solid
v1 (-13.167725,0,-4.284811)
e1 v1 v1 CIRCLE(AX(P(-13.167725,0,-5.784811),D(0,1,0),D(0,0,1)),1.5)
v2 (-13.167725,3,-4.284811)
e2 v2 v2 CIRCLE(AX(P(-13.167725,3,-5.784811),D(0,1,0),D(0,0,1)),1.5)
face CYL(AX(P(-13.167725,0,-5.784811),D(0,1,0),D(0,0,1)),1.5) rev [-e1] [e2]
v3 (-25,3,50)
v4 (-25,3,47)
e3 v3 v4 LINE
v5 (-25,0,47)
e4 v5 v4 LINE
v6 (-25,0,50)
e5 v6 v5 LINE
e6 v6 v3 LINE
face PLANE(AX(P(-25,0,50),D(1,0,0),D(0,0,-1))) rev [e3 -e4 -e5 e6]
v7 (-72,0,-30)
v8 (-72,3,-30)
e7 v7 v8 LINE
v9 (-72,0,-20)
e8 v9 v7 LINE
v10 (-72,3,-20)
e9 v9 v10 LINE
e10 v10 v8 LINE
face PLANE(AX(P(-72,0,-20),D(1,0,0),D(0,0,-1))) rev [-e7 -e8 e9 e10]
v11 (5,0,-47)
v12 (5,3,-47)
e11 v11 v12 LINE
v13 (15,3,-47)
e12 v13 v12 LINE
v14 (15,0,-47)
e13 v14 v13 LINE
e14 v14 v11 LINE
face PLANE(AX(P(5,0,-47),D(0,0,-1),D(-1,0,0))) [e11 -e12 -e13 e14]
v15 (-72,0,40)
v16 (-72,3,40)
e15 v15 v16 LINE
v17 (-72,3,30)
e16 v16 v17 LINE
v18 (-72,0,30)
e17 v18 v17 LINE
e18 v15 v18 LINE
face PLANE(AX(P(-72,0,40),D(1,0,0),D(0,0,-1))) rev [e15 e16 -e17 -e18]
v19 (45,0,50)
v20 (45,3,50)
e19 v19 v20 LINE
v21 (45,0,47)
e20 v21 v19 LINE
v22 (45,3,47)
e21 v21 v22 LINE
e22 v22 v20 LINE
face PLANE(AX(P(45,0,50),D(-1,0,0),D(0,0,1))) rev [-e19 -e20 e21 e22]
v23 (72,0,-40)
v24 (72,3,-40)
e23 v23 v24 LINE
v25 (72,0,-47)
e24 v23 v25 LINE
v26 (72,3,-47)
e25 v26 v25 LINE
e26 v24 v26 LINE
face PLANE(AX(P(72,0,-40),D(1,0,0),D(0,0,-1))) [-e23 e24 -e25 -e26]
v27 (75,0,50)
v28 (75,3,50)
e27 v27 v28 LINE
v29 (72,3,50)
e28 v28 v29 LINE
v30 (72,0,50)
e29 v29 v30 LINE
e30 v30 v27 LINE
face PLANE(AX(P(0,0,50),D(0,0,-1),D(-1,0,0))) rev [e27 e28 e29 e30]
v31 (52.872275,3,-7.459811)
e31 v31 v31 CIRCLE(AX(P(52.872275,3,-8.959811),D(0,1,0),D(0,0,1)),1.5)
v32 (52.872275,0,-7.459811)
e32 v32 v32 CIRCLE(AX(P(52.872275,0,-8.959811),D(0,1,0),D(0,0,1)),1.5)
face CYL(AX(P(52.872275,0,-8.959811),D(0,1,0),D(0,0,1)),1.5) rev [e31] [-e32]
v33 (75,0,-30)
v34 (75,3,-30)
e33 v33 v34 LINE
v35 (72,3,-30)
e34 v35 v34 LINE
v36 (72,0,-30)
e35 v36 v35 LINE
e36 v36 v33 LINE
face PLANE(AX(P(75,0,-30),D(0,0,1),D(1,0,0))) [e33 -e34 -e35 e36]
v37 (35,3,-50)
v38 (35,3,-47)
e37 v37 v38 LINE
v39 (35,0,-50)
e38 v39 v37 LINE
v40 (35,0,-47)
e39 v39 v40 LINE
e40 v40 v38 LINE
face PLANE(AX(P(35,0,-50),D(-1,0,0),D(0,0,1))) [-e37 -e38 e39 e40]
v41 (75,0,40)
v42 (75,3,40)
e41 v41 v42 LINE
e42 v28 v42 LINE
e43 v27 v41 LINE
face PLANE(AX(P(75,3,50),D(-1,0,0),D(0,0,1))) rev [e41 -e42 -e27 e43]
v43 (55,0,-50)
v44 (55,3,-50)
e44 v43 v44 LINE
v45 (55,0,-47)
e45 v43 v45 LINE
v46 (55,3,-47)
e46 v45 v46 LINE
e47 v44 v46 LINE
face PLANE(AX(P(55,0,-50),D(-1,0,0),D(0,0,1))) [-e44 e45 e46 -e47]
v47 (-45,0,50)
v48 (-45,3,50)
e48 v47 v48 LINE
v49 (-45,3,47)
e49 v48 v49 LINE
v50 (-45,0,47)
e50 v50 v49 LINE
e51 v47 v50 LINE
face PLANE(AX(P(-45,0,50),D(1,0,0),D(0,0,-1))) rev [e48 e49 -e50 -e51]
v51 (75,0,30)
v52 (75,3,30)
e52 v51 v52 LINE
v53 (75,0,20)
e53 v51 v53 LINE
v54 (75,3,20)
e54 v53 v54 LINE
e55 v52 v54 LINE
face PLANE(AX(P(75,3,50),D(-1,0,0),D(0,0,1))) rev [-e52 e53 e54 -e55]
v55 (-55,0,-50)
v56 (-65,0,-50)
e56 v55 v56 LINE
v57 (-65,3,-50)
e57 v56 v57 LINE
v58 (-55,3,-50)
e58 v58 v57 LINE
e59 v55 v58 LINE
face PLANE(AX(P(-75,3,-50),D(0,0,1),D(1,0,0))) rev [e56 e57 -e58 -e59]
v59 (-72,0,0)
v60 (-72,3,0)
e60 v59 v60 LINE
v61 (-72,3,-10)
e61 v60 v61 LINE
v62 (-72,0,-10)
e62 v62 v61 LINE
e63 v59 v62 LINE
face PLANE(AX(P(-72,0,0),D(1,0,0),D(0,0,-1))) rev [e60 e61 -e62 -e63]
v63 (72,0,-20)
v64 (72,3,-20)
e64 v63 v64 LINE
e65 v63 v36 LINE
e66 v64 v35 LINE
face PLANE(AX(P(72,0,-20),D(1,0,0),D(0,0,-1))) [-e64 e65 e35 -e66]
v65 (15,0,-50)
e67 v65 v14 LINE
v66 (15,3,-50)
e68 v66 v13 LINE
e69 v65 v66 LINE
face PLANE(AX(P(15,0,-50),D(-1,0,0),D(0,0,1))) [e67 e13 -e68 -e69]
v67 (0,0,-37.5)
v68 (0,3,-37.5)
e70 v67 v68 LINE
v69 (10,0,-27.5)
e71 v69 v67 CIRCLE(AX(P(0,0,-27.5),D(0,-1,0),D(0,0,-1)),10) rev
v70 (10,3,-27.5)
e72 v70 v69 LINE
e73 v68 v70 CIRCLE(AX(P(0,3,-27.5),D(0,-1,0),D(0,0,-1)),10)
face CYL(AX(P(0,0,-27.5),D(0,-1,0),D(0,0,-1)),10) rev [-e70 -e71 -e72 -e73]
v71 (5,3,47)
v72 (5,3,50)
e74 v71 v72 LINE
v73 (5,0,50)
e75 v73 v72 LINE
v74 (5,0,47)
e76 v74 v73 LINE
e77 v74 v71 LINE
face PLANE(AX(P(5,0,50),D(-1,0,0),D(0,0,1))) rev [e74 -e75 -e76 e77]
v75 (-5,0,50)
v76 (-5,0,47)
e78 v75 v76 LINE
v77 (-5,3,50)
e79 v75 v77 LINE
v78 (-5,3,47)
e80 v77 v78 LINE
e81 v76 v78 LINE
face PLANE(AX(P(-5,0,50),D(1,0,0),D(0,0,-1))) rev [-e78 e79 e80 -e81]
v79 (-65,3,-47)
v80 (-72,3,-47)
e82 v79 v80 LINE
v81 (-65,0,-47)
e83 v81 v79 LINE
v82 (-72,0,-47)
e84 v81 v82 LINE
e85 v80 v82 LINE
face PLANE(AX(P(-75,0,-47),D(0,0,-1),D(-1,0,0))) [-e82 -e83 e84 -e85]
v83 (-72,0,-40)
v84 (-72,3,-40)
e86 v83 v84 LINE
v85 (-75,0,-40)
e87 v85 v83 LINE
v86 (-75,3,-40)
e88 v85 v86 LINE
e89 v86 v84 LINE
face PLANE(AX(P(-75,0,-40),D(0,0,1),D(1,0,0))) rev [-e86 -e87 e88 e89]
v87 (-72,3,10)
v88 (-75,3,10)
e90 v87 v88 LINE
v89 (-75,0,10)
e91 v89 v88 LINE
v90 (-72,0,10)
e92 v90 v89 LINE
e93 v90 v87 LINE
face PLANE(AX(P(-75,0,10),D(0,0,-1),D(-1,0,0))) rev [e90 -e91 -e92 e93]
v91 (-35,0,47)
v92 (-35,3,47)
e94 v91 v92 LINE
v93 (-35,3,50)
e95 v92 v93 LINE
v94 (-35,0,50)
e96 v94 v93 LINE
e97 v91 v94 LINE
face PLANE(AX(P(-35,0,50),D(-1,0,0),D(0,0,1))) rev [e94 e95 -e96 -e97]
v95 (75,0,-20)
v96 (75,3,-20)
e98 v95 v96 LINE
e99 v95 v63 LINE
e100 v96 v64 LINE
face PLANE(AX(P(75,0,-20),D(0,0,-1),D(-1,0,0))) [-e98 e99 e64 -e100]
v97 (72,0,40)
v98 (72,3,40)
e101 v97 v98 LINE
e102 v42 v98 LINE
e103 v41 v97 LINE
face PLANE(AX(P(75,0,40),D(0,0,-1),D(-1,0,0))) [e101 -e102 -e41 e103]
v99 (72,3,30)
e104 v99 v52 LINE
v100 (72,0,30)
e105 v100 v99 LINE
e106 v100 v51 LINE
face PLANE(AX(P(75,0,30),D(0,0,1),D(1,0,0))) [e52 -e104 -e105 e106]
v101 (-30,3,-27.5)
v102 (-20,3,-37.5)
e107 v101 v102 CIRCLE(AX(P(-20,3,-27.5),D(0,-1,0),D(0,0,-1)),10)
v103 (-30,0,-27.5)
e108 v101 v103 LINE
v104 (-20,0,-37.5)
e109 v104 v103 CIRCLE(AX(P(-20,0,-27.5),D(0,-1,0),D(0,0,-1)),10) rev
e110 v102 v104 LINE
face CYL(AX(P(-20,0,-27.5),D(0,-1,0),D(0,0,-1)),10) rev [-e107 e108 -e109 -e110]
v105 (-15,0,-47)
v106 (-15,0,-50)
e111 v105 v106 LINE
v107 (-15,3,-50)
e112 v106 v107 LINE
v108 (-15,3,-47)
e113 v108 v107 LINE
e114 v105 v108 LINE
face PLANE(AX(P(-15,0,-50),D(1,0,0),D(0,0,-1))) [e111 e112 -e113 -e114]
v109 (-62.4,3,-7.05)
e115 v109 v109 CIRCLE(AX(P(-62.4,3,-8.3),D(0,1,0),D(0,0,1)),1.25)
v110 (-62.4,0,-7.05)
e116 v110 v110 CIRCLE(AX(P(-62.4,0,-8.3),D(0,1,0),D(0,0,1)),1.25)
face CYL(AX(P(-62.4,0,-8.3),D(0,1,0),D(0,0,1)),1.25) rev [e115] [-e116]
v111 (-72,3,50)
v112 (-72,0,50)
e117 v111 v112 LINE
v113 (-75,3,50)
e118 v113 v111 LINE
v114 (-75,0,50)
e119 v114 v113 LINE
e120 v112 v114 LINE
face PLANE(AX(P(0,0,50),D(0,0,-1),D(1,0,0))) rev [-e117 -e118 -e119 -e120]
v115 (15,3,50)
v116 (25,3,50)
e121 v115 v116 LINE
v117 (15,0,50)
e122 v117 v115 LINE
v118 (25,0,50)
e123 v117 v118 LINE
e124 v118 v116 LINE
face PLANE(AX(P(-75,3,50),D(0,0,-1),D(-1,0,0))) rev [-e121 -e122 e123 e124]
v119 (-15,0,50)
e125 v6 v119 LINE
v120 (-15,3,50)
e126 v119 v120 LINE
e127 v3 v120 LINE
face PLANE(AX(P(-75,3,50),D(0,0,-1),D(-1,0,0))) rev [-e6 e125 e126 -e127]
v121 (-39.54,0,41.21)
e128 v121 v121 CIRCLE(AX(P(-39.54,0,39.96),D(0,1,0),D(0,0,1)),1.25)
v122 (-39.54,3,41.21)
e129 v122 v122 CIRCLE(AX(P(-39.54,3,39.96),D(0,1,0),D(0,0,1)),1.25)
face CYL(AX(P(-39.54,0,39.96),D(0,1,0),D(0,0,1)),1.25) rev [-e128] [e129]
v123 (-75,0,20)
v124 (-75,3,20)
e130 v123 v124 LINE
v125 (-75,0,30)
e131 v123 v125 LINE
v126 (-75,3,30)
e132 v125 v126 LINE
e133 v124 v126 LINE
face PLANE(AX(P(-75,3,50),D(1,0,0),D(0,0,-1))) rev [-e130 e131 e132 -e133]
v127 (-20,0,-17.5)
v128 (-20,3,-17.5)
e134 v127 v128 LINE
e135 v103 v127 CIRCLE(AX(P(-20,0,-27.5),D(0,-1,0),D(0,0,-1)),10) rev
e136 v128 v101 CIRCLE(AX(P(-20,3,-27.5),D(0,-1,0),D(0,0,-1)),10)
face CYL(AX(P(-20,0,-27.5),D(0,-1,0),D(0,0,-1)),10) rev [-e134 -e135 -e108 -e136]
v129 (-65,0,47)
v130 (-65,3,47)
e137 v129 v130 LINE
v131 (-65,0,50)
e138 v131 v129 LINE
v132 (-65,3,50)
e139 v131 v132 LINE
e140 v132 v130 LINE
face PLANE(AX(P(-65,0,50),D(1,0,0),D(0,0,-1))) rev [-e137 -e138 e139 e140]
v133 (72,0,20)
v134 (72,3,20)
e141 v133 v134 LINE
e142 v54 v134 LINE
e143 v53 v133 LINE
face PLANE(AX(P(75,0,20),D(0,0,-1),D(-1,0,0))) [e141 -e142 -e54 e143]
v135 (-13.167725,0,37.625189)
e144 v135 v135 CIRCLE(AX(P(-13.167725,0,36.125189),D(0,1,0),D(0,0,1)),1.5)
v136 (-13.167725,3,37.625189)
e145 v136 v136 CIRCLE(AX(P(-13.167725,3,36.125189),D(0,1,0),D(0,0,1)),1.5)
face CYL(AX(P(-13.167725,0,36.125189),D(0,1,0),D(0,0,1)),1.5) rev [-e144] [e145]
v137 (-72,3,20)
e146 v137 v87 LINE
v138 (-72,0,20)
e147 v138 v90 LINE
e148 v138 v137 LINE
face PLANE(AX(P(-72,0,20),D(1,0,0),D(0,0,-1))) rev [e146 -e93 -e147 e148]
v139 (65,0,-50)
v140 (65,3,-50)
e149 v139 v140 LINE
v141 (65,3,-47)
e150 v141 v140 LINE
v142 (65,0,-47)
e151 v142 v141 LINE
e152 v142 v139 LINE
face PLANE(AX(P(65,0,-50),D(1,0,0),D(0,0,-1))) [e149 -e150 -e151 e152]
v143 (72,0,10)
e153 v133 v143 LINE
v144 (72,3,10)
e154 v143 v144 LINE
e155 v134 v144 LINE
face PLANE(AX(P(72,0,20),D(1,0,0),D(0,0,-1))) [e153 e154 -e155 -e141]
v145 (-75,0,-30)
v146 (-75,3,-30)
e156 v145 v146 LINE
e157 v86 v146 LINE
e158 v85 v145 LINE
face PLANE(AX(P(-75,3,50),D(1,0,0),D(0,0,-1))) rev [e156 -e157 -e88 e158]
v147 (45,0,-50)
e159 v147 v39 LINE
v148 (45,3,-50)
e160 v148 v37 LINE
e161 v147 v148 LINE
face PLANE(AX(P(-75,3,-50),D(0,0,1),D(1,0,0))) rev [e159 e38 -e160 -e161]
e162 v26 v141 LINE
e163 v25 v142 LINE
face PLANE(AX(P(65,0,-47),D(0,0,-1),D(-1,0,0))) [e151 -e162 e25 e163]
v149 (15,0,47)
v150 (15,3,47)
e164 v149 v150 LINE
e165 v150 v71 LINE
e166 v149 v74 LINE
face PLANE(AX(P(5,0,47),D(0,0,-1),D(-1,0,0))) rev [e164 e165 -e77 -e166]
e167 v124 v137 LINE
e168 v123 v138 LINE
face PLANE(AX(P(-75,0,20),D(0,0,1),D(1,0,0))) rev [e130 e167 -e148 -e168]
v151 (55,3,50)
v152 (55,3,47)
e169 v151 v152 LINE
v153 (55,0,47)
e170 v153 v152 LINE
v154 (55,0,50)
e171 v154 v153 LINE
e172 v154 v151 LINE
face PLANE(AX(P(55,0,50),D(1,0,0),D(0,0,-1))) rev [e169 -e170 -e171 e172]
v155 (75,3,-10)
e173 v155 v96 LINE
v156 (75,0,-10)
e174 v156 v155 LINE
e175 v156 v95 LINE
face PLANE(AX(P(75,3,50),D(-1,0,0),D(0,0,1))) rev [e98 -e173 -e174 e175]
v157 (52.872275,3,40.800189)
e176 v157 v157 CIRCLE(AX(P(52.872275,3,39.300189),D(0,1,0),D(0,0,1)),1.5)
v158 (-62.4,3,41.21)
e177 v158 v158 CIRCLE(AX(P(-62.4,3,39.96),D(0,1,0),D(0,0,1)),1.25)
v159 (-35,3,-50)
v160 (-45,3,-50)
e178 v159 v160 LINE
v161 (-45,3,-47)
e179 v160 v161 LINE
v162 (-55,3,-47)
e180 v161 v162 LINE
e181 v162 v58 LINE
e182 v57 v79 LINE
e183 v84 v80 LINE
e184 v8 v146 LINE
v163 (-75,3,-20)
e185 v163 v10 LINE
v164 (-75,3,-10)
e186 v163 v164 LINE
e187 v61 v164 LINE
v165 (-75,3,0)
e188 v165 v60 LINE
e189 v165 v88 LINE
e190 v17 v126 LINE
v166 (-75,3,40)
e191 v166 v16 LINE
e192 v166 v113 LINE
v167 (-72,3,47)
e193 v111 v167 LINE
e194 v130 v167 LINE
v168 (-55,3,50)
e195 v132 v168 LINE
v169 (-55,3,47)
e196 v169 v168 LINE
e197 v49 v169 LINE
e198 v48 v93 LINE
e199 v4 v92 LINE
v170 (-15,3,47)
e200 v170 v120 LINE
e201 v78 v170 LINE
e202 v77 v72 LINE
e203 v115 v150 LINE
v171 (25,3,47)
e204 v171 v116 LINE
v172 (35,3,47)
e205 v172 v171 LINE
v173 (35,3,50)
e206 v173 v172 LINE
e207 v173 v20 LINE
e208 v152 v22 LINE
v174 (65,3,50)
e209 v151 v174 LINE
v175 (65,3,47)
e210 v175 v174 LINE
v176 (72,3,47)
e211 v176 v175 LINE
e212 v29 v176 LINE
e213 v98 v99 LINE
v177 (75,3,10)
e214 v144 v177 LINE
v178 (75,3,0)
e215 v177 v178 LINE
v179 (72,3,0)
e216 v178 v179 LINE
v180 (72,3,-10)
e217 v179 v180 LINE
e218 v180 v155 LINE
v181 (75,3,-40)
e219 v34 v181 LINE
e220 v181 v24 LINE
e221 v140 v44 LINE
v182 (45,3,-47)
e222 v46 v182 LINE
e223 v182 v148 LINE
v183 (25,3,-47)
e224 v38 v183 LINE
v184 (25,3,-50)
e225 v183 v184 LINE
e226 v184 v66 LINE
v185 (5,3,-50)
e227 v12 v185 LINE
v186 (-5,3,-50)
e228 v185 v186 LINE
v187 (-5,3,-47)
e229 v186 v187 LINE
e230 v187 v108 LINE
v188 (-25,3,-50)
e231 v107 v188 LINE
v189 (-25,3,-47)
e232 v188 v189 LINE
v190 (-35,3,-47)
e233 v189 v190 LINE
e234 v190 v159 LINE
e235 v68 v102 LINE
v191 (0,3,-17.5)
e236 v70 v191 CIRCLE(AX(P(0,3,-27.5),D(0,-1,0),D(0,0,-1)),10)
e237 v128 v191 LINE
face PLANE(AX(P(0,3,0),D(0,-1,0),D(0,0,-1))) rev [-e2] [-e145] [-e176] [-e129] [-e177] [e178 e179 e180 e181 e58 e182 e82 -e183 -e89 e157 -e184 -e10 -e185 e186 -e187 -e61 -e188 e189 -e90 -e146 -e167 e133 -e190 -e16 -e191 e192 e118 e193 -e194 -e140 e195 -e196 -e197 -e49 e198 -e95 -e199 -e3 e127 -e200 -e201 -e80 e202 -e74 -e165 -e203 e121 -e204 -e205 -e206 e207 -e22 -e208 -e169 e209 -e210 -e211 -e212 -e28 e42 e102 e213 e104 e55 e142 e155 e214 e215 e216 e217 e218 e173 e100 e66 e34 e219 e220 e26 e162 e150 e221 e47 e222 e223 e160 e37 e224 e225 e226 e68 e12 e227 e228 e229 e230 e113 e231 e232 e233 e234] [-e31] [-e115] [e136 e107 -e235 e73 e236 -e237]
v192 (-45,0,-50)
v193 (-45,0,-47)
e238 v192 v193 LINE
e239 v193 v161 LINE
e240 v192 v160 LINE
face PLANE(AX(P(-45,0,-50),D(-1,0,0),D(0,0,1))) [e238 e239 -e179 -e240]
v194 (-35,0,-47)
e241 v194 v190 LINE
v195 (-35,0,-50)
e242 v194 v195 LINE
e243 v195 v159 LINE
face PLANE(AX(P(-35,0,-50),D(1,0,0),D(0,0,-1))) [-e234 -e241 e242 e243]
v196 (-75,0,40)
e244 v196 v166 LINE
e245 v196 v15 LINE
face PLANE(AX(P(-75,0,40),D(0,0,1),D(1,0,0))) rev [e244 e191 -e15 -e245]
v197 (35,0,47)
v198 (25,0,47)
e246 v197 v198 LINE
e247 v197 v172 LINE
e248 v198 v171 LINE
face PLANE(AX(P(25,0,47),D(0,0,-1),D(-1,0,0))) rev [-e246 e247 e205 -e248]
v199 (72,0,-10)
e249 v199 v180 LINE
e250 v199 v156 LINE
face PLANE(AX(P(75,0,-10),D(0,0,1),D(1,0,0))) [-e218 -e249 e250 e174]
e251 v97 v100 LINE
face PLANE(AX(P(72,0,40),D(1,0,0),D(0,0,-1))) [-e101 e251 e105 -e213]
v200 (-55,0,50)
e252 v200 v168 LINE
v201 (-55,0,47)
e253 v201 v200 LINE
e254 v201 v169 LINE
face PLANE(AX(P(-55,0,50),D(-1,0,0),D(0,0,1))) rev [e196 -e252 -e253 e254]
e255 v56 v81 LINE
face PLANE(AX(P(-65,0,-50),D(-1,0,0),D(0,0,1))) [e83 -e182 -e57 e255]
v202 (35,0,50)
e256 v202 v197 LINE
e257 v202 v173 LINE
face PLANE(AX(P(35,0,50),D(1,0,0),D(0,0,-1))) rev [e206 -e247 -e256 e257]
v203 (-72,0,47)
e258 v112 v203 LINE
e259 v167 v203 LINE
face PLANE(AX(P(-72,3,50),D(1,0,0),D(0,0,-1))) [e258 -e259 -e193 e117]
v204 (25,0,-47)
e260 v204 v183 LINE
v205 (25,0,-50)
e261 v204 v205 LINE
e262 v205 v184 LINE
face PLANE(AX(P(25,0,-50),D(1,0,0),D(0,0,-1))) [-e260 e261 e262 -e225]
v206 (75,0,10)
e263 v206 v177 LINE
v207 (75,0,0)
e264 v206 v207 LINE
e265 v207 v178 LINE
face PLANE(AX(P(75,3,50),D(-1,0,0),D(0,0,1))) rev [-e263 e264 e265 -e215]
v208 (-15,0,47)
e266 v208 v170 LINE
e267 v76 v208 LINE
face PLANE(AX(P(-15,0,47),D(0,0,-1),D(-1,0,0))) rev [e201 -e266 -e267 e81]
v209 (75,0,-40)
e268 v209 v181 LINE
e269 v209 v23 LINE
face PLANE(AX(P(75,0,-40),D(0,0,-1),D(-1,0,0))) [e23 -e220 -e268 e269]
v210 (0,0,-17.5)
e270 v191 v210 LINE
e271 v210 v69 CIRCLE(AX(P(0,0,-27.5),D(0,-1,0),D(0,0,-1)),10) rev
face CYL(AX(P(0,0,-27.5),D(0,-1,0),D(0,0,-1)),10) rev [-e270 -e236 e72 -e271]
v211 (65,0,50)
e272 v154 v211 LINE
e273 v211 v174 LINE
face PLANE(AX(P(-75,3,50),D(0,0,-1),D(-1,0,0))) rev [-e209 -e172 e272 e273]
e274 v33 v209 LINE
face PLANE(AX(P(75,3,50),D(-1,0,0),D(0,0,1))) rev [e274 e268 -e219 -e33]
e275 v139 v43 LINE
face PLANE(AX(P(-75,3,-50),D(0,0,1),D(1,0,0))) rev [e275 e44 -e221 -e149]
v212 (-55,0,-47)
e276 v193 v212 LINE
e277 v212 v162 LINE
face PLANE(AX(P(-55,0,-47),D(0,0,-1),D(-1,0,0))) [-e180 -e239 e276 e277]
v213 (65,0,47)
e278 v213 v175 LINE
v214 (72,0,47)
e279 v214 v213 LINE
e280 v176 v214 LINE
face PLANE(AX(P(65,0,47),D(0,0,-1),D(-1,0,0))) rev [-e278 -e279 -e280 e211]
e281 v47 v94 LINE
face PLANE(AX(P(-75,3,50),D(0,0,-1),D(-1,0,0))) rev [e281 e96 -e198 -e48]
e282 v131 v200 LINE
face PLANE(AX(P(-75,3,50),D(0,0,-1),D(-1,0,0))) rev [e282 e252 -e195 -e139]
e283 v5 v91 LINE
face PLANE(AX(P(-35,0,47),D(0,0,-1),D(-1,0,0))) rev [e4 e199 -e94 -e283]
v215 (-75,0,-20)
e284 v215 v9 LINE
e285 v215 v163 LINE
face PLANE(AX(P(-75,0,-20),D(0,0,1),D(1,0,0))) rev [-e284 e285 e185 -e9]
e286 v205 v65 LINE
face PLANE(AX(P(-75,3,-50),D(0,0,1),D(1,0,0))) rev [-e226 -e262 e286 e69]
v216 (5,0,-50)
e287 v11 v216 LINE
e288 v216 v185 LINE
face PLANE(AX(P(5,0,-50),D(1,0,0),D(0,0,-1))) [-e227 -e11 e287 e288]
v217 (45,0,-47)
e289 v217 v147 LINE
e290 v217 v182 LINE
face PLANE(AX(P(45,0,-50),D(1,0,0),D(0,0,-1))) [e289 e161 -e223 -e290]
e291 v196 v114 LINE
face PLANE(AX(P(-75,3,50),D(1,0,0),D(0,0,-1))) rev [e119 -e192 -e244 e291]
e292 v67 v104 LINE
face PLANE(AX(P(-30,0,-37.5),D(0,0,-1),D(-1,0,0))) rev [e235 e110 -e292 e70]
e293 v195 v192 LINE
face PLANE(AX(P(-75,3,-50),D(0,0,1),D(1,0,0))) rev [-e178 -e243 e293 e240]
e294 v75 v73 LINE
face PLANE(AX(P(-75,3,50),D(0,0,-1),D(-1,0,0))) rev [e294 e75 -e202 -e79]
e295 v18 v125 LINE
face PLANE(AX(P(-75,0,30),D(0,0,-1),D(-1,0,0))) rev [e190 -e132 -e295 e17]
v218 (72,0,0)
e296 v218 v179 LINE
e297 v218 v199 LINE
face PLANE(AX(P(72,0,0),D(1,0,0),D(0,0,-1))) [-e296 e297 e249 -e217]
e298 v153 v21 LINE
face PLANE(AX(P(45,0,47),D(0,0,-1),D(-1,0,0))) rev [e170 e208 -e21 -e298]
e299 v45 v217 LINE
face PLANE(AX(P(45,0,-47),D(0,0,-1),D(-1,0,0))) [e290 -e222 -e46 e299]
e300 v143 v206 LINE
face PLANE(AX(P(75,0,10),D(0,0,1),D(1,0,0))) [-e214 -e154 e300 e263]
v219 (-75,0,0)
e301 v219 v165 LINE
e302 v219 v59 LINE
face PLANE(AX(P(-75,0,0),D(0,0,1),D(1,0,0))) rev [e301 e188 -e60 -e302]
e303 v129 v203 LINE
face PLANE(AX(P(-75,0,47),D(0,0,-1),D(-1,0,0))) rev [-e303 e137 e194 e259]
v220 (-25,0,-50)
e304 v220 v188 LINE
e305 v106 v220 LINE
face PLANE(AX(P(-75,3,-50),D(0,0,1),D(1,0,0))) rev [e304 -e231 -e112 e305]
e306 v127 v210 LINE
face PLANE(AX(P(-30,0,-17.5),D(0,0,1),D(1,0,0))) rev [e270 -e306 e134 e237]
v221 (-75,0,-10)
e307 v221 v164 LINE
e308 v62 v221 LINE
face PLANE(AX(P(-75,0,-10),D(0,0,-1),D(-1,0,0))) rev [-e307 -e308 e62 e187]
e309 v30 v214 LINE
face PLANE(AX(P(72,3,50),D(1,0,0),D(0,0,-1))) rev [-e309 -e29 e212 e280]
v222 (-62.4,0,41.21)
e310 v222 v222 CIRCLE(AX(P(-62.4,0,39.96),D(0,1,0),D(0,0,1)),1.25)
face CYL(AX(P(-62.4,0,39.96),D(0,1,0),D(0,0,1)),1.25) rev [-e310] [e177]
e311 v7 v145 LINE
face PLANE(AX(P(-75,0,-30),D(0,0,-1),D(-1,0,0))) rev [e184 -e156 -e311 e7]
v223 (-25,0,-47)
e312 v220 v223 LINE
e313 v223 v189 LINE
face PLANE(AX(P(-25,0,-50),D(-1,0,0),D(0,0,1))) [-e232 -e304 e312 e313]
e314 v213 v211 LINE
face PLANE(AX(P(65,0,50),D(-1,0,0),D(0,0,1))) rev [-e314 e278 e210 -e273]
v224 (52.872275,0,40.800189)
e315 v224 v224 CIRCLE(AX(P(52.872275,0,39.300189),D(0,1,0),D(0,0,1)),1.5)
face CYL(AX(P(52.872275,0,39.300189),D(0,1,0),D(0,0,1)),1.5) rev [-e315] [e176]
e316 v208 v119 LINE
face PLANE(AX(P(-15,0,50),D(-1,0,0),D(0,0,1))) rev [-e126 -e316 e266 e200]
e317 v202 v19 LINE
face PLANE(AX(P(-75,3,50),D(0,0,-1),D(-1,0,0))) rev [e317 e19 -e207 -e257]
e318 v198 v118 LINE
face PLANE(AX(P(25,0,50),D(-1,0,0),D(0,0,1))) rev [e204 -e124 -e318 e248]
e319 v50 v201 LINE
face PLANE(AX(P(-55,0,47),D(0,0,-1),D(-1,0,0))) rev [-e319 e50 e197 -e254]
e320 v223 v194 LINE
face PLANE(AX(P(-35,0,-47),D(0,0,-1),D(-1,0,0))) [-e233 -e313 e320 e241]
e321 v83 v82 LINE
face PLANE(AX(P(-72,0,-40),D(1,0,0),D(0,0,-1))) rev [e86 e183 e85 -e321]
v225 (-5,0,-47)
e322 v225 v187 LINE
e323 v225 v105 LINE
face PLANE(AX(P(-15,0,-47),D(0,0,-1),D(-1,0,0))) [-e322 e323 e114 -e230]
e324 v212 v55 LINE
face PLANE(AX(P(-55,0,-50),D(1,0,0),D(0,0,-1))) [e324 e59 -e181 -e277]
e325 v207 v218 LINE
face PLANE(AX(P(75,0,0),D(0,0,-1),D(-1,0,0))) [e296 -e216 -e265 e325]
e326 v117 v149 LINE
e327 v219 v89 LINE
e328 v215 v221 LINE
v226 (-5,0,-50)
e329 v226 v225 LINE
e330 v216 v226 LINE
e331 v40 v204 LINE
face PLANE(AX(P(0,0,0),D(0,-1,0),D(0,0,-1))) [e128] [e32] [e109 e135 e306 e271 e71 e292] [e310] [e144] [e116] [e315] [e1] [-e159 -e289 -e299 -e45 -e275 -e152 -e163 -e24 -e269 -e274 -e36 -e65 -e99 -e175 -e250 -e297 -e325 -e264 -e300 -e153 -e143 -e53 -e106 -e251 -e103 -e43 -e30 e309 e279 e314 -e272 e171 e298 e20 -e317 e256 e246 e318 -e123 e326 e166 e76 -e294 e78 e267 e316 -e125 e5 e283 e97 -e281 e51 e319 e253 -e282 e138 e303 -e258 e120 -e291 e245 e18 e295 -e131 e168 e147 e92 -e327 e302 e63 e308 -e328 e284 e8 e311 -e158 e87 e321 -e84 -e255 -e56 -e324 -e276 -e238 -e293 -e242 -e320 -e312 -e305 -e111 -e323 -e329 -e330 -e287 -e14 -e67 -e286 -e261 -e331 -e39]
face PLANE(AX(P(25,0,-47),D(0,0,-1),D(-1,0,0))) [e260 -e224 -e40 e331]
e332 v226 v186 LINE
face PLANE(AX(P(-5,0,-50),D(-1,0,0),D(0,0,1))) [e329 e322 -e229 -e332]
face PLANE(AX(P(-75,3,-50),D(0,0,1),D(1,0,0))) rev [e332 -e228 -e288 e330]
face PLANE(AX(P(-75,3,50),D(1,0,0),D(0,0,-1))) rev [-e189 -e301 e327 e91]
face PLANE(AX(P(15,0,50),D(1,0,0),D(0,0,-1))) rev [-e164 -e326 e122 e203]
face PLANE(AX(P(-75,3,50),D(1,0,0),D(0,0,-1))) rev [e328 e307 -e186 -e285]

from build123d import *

# Parameters (mm, degrees)
SKETCH1_W               = 150
SKETCH1_H               = 100
BOSS_EXTRUDE1_DEPTH     = 3
SKETCH2_W               = 10
SKETCH2_H               = 3
CUT_EXTRUDE2_DEPTH      = 91.188691087
LPATTERN1_COUNT         = 8
LPATTERN1_PITCH         = 20
MIRROR1_COPY_1_SKETCH_W = 10
MIRROR1_COPY_1_SKETCH_H = 3
MIRROR1_COPY_1_DEPTH    = 91.188691087
MIRROR1_COPY_2_SKETCH_W = 10
MIRROR1_COPY_2_SKETCH_H = 3
MIRROR1_COPY_2_DEPTH    = 91.188691087
MIRROR1_COPY_3_SKETCH_W = 10
MIRROR1_COPY_3_SKETCH_H = 3
MIRROR1_COPY_3_DEPTH    = 91.188691087
MIRROR1_COPY_4_SKETCH_W = 10
MIRROR1_COPY_4_SKETCH_H = 3
MIRROR1_COPY_4_DEPTH    = 91.188691087
MIRROR1_COPY_5_SKETCH_W = 10
MIRROR1_COPY_5_SKETCH_H = 3
MIRROR1_COPY_5_DEPTH    = 91.188691087
MIRROR1_COPY_6_SKETCH_W = 10
MIRROR1_COPY_6_SKETCH_H = 3
MIRROR1_COPY_6_DEPTH    = 91.188691087
MIRROR1_COPY_7_SKETCH_W = 10
MIRROR1_COPY_7_SKETCH_H = 3
MIRROR1_COPY_7_DEPTH    = 91.188691087
SKETCH3_W               = 3
SKETCH3_H               = 10
CUT_EXTRUDE3_DEPTH      = 91.188691087
LPATTERN2_COUNT         = 5
LPATTERN2_PITCH         = 20
MIRROR2_COPY_1_SKETCH_W = 3
MIRROR2_COPY_1_SKETCH_H = 10
MIRROR2_COPY_1_DEPTH    = 91.188691087
MIRROR2_COPY_2_SKETCH_W = 3
MIRROR2_COPY_2_SKETCH_H = 10
MIRROR2_COPY_2_DEPTH    = 91.188691087
MIRROR2_COPY_3_SKETCH_W = 3
MIRROR2_COPY_3_SKETCH_H = 10
MIRROR2_COPY_3_DEPTH    = 91.188691087
MIRROR2_COPY_4_SKETCH_W = 3
MIRROR2_COPY_4_SKETCH_H = 10
MIRROR2_COPY_4_DEPTH    = 91.188691087
SKETCH4_W               = 40
SKETCH4_H               = 20
CUT_EXTRUDE4_DEPTH      = 91.188691087
FILLET1_R               = 10
SKETCH5_W               = 3
SKETCH5_H               = 3
BOSS_EXTRUDE2_DEPTH     = 3
SKETCH6_R               = 1.5
SKETCH6_R_2             = 1.25
CUT_EXTRUDE5_DEPTH      = 91.188691087


with BuildPart() as part:
    # Sketch1 → Boss-Extrude1 (new body)
    with BuildSketch(Plane(origin=(0, 0, 0), x_dir=(1, 0, 0), z_dir=(0, 1, 0))):
        Rectangle(SKETCH1_W, SKETCH1_H)
    extrude(amount=BOSS_EXTRUDE1_DEPTH)

    # Sketch2 → Cut-Extrude2 (cut, through all)
    with BuildSketch(Plane(origin=(0, 3, 0), x_dir=(1, 0, 0), z_dir=(0, 1, 0))):
        with Locations((-70, -48.5)):
            Rectangle(SKETCH2_W, SKETCH2_H)
    cut_extrude2 = extrude(amount=-CUT_EXTRUDE2_DEPTH, mode=Mode.SUBTRACT)

    # LPattern1: Cut-Extrude2 ×8
    with Locations(*[(i * LPATTERN1_PITCH, 0, 0) for i in range(1, LPATTERN1_COUNT)]):
        add(cut_extrude2, mode=Mode.SUBTRACT)

    # Mirror1: Cut-Extrude2 across plane
    add(cut_extrude2.mirror(Plane.XY), mode=Mode.SUBTRACT)

    # Mirror1 copy 1 sketch → Mirror1 copy 1 (cut, through all)
    with BuildSketch(Plane(origin=(20, 3, 0), x_dir=(1, 0, 0), z_dir=(0, 1, 0))):
        with Locations((-70, 48.5)):
            Rectangle(MIRROR1_COPY_1_SKETCH_W, MIRROR1_COPY_1_SKETCH_H)
    extrude(amount=-MIRROR1_COPY_1_DEPTH, mode=Mode.SUBTRACT)

    # Mirror1 copy 2 sketch → Mirror1 copy 2 (cut, through all)
    with BuildSketch(Plane(origin=(40, 3, 0), x_dir=(1, 0, 0), z_dir=(0, 1, 0))):
        with Locations((-70, 48.5)):
            Rectangle(MIRROR1_COPY_2_SKETCH_W, MIRROR1_COPY_2_SKETCH_H)
    extrude(amount=-MIRROR1_COPY_2_DEPTH, mode=Mode.SUBTRACT)

    # Mirror1 copy 3 sketch → Mirror1 copy 3 (cut, through all)
    with BuildSketch(Plane(origin=(60, 3, 0), x_dir=(1, 0, 0), z_dir=(0, 1, 0))):
        with Locations((-70, 48.5)):
            Rectangle(MIRROR1_COPY_3_SKETCH_W, MIRROR1_COPY_3_SKETCH_H)
    extrude(amount=-MIRROR1_COPY_3_DEPTH, mode=Mode.SUBTRACT)

    # Mirror1 copy 4 sketch → Mirror1 copy 4 (cut, through all)
    with BuildSketch(Plane(origin=(80, 3, 0), x_dir=(1, 0, 0), z_dir=(0, 1, 0))):
        with Locations((-70, 48.5)):
            Rectangle(MIRROR1_COPY_4_SKETCH_W, MIRROR1_COPY_4_SKETCH_H)
    extrude(amount=-MIRROR1_COPY_4_DEPTH, mode=Mode.SUBTRACT)

    # Mirror1 copy 5 sketch → Mirror1 copy 5 (cut, through all)
    with BuildSketch(Plane(origin=(100, 3, 0), x_dir=(1, 0, 0), z_dir=(0, 1, 0))):
        with Locations((-70, 48.5)):
            Rectangle(MIRROR1_COPY_5_SKETCH_W, MIRROR1_COPY_5_SKETCH_H)
    extrude(amount=-MIRROR1_COPY_5_DEPTH, mode=Mode.SUBTRACT)

    # Mirror1 copy 6 sketch → Mirror1 copy 6 (cut, through all)
    with BuildSketch(Plane(origin=(120, 3, 0), x_dir=(1, 0, 0), z_dir=(0, 1, 0))):
        with Locations((-70, 48.5)):
            Rectangle(MIRROR1_COPY_6_SKETCH_W, MIRROR1_COPY_6_SKETCH_H)
    extrude(amount=-MIRROR1_COPY_6_DEPTH, mode=Mode.SUBTRACT)

    # Mirror1 copy 7 sketch → Mirror1 copy 7 (cut, through all)
    with BuildSketch(Plane(origin=(140, 3, 0), x_dir=(1, 0, 0), z_dir=(0, 1, 0))):
        with Locations((-70, 48.5)):
            Rectangle(MIRROR1_COPY_7_SKETCH_W, MIRROR1_COPY_7_SKETCH_H)
    extrude(amount=-MIRROR1_COPY_7_DEPTH, mode=Mode.SUBTRACT)

    # Sketch3 → Cut-Extrude3 (cut, through all)
    with BuildSketch(Plane(origin=(0, 3, 0), x_dir=(1, 0, 0), z_dir=(0, 1, 0))):
        with Locations((-73.5, -35)):
            Rectangle(SKETCH3_W, SKETCH3_H)
    cut_extrude3 = extrude(amount=-CUT_EXTRUDE3_DEPTH, mode=Mode.SUBTRACT)

    # LPattern2: Cut-Extrude3 ×5
    with Locations(*[(0, 0, -i * LPATTERN2_PITCH) for i in range(1, LPATTERN2_COUNT)]):
        add(cut_extrude3, mode=Mode.SUBTRACT)

    # Mirror2: Cut-Extrude3 across plane
    add(cut_extrude3.mirror(Plane(origin=(0, 0, 0), x_dir=(0, 0, 1), z_dir=(1, 0, 0))), mode=Mode.SUBTRACT)

    # Mirror2 copy 1 sketch → Mirror2 copy 1 (cut, through all)
    with BuildSketch(Plane(origin=(0, 3, -20), x_dir=(-1, 0, 0), z_dir=(0, 1, 0))):
        with Locations((-73.5, 35)):
            Rectangle(MIRROR2_COPY_1_SKETCH_W, MIRROR2_COPY_1_SKETCH_H)
    extrude(amount=-MIRROR2_COPY_1_DEPTH, mode=Mode.SUBTRACT)

    # Mirror2 copy 2 sketch → Mirror2 copy 2 (cut, through all)
    with BuildSketch(Plane(origin=(0, 3, -40), x_dir=(-1, 0, 0), z_dir=(0, 1, 0))):
        with Locations((-73.5, 35)):
            Rectangle(MIRROR2_COPY_2_SKETCH_W, MIRROR2_COPY_2_SKETCH_H)
    extrude(amount=-MIRROR2_COPY_2_DEPTH, mode=Mode.SUBTRACT)

    # Mirror2 copy 3 sketch → Mirror2 copy 3 (cut, through all)
    with BuildSketch(Plane(origin=(0, 3, -60), x_dir=(-1, 0, 0), z_dir=(0, 1, 0))):
        with Locations((-73.5, 35)):
            Rectangle(MIRROR2_COPY_3_SKETCH_W, MIRROR2_COPY_3_SKETCH_H)
    extrude(amount=-MIRROR2_COPY_3_DEPTH, mode=Mode.SUBTRACT)

    # Mirror2 copy 4 sketch → Mirror2 copy 4 (cut, through all)
    with BuildSketch(Plane(origin=(0, 3, -80), x_dir=(-1, 0, 0), z_dir=(0, 1, 0))):
        with Locations((-73.5, 35)):
            Rectangle(MIRROR2_COPY_4_SKETCH_W, MIRROR2_COPY_4_SKETCH_H)
    extrude(amount=-MIRROR2_COPY_4_DEPTH, mode=Mode.SUBTRACT)

    # Sketch4 → Cut-Extrude4 (cut, through all)
    with BuildSketch(Plane(origin=(0, 3, 0), x_dir=(1, 0, 0), z_dir=(0, 1, 0))):
        with Locations((-10, 27.5)):
            Rectangle(SKETCH4_W, SKETCH4_H)
    extrude(amount=-CUT_EXTRUDE4_DEPTH, mode=Mode.SUBTRACT)

    # Fillet1
    fillet1_edges = [part.edges().sort_by_distance(p)[0] for p in [
        (10, 1.5, -17.5),
        (10, 1.5, -37.5),
        (-30, 1.5, -37.5),
        (-30, 1.5, -17.5),
    ]]
    fillet(fillet1_edges, radius=FILLET1_R - 0.0001)  # a hair under: the kernel refuses the full size

    # Sketch5 → Boss-Extrude2 (add)
    with BuildSketch(Plane.XY.offset(47)):
        with Locations((73.5, 1.5)):
            Rectangle(SKETCH5_W, SKETCH5_H)
    boss_extrude2 = extrude(amount=BOSS_EXTRUDE2_DEPTH)

    # Mirror3: Boss-Extrude2 across plane
    add(boss_extrude2.mirror(Plane(origin=(0, 0, 0), x_dir=(0, 0, 1), z_dir=(1, 0, 0))))

    # Sketch6 → Cut-Extrude5 (cut, through all)
    with BuildSketch(Plane(origin=(0, 3, 0), x_dir=(1, 0, 0), z_dir=(0, 1, 0))):
        with Locations(Location((-13.16772538, -36.12518928, 0), (0, 0, 270))):
            Circle(SKETCH6_R)
        with Locations(Location((-13.16772538, 5.78481072, 0), (0, 0, 270))):
            Circle(SKETCH6_R)
        with Locations(Location((52.87227462, 8.95981072, 0), (0, 0, 270))):
            Circle(SKETCH6_R)
        with Locations(Location((52.87227462, -39.30018928, 0), (0, 0, 270))):
            Circle(SKETCH6_R)
        with Locations(Location((-39.54, -39.96, 0), (0, 0, 270))):
            Circle(SKETCH6_R_2)
        with Locations(Location((-62.4, -39.96, 0), (0, 0, 270))):
            Circle(SKETCH6_R_2)
        with Locations(Location((-62.4, 8.3, 0), (0, 0, 270))):
            Circle(SKETCH6_R_2)
    extrude(amount=-CUT_EXTRUDE5_DEPTH, mode=Mode.SUBTRACT)


solid = part.part
